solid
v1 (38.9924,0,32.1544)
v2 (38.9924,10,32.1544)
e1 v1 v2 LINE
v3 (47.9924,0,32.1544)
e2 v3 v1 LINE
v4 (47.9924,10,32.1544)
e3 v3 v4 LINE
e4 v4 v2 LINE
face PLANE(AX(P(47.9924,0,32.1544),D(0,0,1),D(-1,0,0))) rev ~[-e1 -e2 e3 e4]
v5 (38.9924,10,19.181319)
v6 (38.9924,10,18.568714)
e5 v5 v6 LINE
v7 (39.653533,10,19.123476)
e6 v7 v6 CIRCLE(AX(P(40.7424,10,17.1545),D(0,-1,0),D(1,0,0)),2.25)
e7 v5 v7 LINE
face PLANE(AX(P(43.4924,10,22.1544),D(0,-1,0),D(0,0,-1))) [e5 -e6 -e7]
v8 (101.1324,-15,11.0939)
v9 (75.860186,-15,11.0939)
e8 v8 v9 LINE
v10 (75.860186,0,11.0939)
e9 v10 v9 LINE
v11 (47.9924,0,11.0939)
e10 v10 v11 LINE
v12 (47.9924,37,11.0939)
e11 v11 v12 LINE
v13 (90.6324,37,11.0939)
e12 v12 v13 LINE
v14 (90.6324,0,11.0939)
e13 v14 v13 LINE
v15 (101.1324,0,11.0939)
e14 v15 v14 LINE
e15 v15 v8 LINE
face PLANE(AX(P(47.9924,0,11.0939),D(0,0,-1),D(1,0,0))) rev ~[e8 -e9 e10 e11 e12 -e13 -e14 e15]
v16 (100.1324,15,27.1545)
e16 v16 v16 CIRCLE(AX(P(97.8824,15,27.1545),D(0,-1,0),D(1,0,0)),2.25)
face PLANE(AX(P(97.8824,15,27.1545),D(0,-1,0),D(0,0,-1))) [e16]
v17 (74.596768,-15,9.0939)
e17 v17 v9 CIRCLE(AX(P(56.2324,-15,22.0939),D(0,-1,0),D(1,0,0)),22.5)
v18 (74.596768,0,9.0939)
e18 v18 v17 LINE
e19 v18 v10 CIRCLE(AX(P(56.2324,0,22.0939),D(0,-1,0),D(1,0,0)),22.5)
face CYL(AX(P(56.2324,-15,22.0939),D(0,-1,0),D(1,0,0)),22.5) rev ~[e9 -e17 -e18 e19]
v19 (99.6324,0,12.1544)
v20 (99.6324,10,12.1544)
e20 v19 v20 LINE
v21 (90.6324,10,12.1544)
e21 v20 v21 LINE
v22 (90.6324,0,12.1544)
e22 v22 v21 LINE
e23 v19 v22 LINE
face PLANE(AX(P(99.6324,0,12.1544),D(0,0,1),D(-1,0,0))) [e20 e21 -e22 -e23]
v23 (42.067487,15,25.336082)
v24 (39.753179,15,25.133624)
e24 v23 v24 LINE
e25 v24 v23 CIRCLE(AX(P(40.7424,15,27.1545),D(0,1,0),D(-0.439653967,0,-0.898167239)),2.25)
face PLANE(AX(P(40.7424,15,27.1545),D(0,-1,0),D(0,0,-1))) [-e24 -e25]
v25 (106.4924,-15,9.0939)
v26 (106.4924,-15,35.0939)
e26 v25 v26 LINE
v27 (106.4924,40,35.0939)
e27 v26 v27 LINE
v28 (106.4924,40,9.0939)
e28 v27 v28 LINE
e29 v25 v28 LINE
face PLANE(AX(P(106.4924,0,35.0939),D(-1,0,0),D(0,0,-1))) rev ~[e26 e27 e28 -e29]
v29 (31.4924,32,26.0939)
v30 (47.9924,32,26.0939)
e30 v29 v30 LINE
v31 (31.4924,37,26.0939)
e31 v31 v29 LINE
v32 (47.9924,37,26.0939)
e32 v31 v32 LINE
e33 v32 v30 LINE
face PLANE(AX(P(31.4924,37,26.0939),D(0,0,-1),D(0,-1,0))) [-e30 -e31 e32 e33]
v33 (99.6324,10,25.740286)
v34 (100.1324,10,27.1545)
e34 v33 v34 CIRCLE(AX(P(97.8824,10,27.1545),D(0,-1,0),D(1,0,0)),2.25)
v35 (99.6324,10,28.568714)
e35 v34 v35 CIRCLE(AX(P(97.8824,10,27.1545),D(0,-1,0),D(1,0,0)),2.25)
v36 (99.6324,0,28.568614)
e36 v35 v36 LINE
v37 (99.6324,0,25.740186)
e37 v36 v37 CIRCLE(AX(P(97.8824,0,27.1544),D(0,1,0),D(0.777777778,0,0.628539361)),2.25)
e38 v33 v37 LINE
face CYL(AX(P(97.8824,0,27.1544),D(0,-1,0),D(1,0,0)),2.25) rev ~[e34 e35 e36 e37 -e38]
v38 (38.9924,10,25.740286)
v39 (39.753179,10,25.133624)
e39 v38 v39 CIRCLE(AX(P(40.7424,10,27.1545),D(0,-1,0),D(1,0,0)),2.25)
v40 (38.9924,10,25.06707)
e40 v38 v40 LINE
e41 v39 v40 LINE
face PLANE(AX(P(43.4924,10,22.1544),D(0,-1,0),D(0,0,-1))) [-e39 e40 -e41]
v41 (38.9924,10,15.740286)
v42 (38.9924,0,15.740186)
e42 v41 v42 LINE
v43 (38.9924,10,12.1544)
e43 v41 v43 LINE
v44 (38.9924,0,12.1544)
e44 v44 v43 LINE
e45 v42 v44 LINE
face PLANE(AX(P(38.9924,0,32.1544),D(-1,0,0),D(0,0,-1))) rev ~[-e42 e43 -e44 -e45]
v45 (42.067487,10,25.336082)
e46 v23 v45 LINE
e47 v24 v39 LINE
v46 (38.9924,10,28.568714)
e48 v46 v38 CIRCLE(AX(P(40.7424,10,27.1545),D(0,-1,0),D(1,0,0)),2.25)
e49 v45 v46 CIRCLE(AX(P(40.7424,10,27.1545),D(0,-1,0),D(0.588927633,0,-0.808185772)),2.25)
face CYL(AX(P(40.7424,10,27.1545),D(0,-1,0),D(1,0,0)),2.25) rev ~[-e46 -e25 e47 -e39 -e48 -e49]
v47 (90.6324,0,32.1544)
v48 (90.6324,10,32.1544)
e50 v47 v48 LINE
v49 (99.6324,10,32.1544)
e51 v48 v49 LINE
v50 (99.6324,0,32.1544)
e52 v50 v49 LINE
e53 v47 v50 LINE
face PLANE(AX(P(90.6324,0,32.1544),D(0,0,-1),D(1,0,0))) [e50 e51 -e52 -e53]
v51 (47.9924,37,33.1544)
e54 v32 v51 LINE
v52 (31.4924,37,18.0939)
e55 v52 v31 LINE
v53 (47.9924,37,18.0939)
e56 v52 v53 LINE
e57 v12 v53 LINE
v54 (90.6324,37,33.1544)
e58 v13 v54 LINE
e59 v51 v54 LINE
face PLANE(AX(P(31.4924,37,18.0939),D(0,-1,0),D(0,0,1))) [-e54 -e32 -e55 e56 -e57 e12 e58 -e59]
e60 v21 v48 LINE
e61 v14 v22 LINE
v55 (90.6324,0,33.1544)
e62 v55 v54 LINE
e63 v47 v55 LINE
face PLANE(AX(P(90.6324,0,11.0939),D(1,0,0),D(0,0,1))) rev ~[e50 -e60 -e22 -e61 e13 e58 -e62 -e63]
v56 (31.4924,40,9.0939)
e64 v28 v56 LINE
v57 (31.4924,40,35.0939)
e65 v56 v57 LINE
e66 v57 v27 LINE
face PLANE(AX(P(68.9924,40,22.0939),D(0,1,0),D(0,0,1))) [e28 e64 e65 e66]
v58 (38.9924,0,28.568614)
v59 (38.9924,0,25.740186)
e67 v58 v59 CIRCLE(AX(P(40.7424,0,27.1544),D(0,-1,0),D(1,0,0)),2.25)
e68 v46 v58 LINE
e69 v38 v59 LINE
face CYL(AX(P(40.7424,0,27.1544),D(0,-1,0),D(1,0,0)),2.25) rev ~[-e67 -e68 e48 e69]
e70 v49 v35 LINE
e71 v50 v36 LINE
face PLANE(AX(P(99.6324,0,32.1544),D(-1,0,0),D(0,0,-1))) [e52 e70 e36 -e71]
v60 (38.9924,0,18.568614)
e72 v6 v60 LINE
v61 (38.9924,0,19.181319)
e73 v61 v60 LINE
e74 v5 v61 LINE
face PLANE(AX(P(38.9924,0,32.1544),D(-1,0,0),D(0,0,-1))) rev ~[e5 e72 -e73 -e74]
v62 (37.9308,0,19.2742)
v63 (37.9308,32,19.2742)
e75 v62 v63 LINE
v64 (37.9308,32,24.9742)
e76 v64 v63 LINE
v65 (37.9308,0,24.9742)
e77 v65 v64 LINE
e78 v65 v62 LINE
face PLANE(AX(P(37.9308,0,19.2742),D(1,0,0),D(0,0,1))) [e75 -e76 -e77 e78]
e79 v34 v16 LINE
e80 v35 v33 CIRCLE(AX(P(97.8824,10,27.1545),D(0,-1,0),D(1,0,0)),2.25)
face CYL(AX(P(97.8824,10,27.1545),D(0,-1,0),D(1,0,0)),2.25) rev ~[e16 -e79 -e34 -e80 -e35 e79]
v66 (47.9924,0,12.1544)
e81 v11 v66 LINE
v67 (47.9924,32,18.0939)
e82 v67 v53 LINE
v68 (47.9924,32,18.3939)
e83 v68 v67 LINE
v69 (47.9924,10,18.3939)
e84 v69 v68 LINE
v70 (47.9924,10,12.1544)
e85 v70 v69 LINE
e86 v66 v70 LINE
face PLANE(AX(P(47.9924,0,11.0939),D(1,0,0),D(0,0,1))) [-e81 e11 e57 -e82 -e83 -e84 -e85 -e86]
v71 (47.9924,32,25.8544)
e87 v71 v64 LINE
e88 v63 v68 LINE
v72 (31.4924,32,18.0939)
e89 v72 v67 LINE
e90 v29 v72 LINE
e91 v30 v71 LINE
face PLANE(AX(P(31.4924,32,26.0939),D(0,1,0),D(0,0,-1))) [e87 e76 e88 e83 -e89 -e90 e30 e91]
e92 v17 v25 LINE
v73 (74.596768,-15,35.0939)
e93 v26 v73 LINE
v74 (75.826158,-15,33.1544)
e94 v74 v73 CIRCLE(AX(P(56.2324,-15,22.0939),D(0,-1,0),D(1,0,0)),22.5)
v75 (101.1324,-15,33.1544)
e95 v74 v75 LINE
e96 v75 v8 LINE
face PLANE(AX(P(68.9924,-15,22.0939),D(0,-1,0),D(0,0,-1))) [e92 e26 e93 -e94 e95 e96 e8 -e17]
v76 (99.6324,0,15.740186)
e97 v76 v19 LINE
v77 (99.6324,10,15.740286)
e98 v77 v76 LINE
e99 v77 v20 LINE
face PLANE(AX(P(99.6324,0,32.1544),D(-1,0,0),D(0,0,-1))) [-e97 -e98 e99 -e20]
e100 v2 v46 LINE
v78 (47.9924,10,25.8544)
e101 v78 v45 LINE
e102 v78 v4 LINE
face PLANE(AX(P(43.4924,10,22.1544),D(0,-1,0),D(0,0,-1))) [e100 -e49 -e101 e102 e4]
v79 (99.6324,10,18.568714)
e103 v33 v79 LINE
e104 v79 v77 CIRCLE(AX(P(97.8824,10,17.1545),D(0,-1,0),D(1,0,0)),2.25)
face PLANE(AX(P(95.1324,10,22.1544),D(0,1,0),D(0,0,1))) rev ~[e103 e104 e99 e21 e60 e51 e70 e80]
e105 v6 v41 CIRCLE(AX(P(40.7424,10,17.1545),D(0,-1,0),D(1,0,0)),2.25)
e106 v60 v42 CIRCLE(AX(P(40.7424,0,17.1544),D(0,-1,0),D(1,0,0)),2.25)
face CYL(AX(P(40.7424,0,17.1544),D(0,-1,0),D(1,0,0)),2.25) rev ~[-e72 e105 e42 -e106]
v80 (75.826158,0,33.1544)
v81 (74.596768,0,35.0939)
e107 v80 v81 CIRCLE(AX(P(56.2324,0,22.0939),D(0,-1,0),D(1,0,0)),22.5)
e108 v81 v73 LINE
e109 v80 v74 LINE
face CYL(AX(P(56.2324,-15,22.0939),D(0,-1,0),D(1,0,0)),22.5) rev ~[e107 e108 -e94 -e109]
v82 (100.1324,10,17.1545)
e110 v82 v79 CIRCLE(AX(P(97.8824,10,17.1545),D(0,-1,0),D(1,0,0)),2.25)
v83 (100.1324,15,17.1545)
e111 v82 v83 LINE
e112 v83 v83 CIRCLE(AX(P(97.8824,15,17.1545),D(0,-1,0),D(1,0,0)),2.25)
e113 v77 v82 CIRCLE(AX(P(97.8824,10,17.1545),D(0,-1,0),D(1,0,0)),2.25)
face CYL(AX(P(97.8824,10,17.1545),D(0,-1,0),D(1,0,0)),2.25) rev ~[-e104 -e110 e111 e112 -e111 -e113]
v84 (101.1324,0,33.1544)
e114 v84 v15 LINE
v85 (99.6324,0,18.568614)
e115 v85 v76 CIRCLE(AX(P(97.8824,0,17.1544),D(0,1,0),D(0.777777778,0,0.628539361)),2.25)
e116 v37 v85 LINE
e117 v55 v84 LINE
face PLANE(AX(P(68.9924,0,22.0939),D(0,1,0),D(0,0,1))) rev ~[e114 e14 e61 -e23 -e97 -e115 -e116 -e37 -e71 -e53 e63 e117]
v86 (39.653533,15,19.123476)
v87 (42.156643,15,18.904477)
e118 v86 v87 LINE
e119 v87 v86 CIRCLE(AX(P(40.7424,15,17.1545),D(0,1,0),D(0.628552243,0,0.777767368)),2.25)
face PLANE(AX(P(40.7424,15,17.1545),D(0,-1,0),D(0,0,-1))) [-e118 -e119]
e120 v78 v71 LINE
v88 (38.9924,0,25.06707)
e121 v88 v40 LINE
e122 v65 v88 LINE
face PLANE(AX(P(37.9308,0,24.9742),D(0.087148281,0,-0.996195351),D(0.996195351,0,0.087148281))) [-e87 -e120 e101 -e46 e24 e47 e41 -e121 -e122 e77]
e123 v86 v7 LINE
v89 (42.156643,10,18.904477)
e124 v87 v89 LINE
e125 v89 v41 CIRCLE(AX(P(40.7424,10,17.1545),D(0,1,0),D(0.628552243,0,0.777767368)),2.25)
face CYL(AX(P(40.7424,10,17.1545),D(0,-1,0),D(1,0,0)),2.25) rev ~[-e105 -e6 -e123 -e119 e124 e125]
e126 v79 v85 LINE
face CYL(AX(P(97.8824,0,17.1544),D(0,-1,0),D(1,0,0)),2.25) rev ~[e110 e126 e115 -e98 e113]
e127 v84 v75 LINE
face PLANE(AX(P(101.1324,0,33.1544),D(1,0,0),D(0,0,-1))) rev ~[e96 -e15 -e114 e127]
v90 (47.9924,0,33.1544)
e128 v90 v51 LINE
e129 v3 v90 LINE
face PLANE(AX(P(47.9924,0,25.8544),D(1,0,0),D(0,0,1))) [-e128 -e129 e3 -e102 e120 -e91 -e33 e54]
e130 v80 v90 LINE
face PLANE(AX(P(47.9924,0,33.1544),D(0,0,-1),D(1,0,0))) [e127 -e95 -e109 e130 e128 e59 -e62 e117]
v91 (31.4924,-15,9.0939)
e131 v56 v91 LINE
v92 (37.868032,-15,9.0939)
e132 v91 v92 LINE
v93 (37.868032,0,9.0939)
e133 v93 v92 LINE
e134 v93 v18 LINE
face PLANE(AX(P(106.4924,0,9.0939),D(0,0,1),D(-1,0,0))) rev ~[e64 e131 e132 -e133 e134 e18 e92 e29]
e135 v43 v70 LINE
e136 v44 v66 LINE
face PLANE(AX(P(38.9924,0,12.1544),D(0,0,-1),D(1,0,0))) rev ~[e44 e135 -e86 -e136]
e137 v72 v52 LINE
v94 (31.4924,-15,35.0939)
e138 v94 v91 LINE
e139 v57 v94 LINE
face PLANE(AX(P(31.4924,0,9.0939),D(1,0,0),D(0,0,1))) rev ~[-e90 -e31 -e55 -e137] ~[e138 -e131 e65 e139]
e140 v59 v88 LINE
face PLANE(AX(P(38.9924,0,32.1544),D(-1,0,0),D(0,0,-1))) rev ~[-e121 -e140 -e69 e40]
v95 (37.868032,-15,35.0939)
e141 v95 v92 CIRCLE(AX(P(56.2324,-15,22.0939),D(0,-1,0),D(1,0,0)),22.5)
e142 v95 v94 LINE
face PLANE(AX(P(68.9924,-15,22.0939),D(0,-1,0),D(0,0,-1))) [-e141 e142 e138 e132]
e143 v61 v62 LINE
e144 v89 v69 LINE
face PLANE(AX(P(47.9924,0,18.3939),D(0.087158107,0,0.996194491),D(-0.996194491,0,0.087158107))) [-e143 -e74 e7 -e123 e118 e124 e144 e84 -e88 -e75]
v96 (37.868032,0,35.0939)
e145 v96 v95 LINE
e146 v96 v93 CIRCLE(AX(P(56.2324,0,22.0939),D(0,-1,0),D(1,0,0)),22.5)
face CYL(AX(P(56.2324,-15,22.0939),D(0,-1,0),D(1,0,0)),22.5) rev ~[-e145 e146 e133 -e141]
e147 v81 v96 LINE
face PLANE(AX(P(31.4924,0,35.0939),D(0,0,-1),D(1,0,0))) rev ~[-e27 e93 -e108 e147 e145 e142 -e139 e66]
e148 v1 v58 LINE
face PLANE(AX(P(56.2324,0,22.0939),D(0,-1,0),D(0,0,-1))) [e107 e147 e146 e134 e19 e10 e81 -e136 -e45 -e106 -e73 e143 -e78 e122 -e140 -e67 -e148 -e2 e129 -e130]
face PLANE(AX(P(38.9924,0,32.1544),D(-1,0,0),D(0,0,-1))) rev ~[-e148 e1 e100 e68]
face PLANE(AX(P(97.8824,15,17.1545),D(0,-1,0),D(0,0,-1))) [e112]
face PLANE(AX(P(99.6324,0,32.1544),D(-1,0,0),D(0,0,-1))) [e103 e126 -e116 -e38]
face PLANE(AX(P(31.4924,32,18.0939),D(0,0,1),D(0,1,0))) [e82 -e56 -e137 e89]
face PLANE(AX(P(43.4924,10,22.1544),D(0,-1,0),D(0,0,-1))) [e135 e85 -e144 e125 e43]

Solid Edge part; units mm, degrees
sketch "Sketch1" plane through (0, 0, 0) normal (0, -1, 0) x (1, 0, 0)
  line L0 (31.4924, 35.0939) -> (106.4924, 35.0939)
  line L1 (106.4924, 35.0939) -> (106.4924, 9.0939)
  line L2 (106.4924, 9.0939) -> (31.4924, 9.0939)
  line L3 (31.4924, 9.0939) -> (31.4924, 35.0939)
  dimension "D1" = 75
  dimension "D2" = 26
extrude "Protrusion1" add sketch "Sketch1" against normal blind 40
sketch "Sketch2" plane through (64.4924, 0, 22.0939) normal (0, -1, 0) x (1, 0, 0)
  line L0 (-26.5616, 2.8803) -> (-16.5, 3.7605)
  line L1 (-16.5, 3.7605) -> (-16.5, 11.0605)
  line L2 (-16.5, 11.0605) -> (26.14, 11.0605)
  line L3 (26.14, -11) -> (26.14, 11.0605)
  line L4 (-16.5, -11) -> (26.14, -11)
  line L5 (-16.5, -11) -> (-16.5, -3.7)
  line L6 (-16.5, -3.7) -> (-26.5616, -2.8197)
  line L7 (-26.5616, -2.8197) -> (-26.5616, 2.8803)
extrude "ExtrudedCutout_4" cut sketch "Sketch2" against normal blind 37
sketch "Sketch3" plane through (31.4924, 20, 22.0939) normal (-1, 0, 0) x (0, -1, 0)
  line L0 (-17, -4) -> (-17, 4)
  line L1 (-17, 4) -> (-12, 4)
  line L2 (-12, 4) -> (-12, -4)
  line L3 (-12, -4) -> (-17, -4)
  dimension "D1" = 8
  dimension "D2" = 5
  dimension "D3" = 8
  dimension "D4" = 3
  dimension "D5" = 9
extrude "Cutout1" cut sketch "Sketch3" against normal up to next
sketch "Sketch4" plane through (64.4924, 0, 22.0939) normal (0, -1, 0) x (1, 0, 0)
  line L0 (-16.5, 10.0605) -> (-25.5, 10.0605)
  line L1 (-25.5, 10.0605) -> (-25.5, -9.9395)
  line L2 (-25.5, -9.9395) -> (-16.5, -9.9395)
  line L3 (-16.5, -9.9395) -> (-16.5, 10.0605)
  line L4 (26.14, 10.0605) -> (35.14, 10.0605)
  line L5 (35.14, 10.0605) -> (35.14, -9.9395)
  line L6 (35.14, -9.9395) -> (26.14, -9.9395)
  line L7 (26.14, -9.9395) -> (26.14, 10.0605)
  dimension "D1" = 1
  dimension "D2" = 20
  dimension "D3" = 1
  dimension "D4" = 9
  dimension "D5" = 20
  dimension "D6" = 9
extrude "ExtrudedCutout_6" cut sketch "Sketch4" against normal blind 10
sketch "Sketch5" plane through (91.2324, 10, 21.645) normal (0, -1, 0) x (1, 0, 0)
  circle A0 centre (6.65, 5.5095) radius 2.25
  circle A1 centre (-50.49, 5.5095) radius 2.25
  circle A2 centre (-50.49, -4.4905) radius 2.25
  circle A3 centre (6.65, -4.4905) radius 2.25
  dimension "D1" = 7.25
  dimension "D2" = 4.5
  dimension "D3" = 7.25
  dimension "D4" = 10
  dimension "D5" = 5
  dimension "D6" = 10
  dimension "D7" = 5
extrude "ExtrudedCutout_7" cut sketch "Sketch5" against normal blind 5
sketch "Sketch6" plane through (64.4924, 0, 22.0939) normal (0, -1, 0) x (1, 0, 0)
  circle A0 centre (33.39, 5.0605) radius 2.25
  circle A1 centre (33.39, -4.9395) radius 2.25
  circle A2 centre (-23.75, 5.0605) radius 2.25
  circle A3 centre (-23.75, -4.9395) radius 2.25
extrude "Cutout2" cut sketch "Sketch6" against normal up to next
sketch "Sketch7" plane through (68.9924, 0, 22.0939) normal (0, -1, 0) x (1, 0, 0)
  line L0 (-31.0616, 11.0605) -> (32.14, 11.0605)
  line L1 (32.14, 11.0605) -> (32.14, -11)
  line L2 (32.14, -11) -> (-31.0616, -11)
  line L3 (-31.0616, -11) -> (-31.0616, 11.0605)
  line L4 (-37.5, 13) -> (-37.5, -13)
  line L5 (-37.5, -13) -> (37.5, -13)
  line L6 (37.5, -13) -> (37.5, 13)
  line L7 (37.5, 13) -> (-37.5, 13)
  dimension "D1" = 1
extrude "ExtrudedProtrusion_4" add sketch "Sketch7" along normal blind 15
sketch "Sketch8" plane through (68.9924, -15, 22.0939) normal (0, -1, 0) x (1, 0, 0)
  circle A0 centre (-12.76, 0) radius 22.5
  dimension "D1" = 24.74
extrude "ExtrudedCutout_9" cut sketch "Sketch8" against normal blind 15
